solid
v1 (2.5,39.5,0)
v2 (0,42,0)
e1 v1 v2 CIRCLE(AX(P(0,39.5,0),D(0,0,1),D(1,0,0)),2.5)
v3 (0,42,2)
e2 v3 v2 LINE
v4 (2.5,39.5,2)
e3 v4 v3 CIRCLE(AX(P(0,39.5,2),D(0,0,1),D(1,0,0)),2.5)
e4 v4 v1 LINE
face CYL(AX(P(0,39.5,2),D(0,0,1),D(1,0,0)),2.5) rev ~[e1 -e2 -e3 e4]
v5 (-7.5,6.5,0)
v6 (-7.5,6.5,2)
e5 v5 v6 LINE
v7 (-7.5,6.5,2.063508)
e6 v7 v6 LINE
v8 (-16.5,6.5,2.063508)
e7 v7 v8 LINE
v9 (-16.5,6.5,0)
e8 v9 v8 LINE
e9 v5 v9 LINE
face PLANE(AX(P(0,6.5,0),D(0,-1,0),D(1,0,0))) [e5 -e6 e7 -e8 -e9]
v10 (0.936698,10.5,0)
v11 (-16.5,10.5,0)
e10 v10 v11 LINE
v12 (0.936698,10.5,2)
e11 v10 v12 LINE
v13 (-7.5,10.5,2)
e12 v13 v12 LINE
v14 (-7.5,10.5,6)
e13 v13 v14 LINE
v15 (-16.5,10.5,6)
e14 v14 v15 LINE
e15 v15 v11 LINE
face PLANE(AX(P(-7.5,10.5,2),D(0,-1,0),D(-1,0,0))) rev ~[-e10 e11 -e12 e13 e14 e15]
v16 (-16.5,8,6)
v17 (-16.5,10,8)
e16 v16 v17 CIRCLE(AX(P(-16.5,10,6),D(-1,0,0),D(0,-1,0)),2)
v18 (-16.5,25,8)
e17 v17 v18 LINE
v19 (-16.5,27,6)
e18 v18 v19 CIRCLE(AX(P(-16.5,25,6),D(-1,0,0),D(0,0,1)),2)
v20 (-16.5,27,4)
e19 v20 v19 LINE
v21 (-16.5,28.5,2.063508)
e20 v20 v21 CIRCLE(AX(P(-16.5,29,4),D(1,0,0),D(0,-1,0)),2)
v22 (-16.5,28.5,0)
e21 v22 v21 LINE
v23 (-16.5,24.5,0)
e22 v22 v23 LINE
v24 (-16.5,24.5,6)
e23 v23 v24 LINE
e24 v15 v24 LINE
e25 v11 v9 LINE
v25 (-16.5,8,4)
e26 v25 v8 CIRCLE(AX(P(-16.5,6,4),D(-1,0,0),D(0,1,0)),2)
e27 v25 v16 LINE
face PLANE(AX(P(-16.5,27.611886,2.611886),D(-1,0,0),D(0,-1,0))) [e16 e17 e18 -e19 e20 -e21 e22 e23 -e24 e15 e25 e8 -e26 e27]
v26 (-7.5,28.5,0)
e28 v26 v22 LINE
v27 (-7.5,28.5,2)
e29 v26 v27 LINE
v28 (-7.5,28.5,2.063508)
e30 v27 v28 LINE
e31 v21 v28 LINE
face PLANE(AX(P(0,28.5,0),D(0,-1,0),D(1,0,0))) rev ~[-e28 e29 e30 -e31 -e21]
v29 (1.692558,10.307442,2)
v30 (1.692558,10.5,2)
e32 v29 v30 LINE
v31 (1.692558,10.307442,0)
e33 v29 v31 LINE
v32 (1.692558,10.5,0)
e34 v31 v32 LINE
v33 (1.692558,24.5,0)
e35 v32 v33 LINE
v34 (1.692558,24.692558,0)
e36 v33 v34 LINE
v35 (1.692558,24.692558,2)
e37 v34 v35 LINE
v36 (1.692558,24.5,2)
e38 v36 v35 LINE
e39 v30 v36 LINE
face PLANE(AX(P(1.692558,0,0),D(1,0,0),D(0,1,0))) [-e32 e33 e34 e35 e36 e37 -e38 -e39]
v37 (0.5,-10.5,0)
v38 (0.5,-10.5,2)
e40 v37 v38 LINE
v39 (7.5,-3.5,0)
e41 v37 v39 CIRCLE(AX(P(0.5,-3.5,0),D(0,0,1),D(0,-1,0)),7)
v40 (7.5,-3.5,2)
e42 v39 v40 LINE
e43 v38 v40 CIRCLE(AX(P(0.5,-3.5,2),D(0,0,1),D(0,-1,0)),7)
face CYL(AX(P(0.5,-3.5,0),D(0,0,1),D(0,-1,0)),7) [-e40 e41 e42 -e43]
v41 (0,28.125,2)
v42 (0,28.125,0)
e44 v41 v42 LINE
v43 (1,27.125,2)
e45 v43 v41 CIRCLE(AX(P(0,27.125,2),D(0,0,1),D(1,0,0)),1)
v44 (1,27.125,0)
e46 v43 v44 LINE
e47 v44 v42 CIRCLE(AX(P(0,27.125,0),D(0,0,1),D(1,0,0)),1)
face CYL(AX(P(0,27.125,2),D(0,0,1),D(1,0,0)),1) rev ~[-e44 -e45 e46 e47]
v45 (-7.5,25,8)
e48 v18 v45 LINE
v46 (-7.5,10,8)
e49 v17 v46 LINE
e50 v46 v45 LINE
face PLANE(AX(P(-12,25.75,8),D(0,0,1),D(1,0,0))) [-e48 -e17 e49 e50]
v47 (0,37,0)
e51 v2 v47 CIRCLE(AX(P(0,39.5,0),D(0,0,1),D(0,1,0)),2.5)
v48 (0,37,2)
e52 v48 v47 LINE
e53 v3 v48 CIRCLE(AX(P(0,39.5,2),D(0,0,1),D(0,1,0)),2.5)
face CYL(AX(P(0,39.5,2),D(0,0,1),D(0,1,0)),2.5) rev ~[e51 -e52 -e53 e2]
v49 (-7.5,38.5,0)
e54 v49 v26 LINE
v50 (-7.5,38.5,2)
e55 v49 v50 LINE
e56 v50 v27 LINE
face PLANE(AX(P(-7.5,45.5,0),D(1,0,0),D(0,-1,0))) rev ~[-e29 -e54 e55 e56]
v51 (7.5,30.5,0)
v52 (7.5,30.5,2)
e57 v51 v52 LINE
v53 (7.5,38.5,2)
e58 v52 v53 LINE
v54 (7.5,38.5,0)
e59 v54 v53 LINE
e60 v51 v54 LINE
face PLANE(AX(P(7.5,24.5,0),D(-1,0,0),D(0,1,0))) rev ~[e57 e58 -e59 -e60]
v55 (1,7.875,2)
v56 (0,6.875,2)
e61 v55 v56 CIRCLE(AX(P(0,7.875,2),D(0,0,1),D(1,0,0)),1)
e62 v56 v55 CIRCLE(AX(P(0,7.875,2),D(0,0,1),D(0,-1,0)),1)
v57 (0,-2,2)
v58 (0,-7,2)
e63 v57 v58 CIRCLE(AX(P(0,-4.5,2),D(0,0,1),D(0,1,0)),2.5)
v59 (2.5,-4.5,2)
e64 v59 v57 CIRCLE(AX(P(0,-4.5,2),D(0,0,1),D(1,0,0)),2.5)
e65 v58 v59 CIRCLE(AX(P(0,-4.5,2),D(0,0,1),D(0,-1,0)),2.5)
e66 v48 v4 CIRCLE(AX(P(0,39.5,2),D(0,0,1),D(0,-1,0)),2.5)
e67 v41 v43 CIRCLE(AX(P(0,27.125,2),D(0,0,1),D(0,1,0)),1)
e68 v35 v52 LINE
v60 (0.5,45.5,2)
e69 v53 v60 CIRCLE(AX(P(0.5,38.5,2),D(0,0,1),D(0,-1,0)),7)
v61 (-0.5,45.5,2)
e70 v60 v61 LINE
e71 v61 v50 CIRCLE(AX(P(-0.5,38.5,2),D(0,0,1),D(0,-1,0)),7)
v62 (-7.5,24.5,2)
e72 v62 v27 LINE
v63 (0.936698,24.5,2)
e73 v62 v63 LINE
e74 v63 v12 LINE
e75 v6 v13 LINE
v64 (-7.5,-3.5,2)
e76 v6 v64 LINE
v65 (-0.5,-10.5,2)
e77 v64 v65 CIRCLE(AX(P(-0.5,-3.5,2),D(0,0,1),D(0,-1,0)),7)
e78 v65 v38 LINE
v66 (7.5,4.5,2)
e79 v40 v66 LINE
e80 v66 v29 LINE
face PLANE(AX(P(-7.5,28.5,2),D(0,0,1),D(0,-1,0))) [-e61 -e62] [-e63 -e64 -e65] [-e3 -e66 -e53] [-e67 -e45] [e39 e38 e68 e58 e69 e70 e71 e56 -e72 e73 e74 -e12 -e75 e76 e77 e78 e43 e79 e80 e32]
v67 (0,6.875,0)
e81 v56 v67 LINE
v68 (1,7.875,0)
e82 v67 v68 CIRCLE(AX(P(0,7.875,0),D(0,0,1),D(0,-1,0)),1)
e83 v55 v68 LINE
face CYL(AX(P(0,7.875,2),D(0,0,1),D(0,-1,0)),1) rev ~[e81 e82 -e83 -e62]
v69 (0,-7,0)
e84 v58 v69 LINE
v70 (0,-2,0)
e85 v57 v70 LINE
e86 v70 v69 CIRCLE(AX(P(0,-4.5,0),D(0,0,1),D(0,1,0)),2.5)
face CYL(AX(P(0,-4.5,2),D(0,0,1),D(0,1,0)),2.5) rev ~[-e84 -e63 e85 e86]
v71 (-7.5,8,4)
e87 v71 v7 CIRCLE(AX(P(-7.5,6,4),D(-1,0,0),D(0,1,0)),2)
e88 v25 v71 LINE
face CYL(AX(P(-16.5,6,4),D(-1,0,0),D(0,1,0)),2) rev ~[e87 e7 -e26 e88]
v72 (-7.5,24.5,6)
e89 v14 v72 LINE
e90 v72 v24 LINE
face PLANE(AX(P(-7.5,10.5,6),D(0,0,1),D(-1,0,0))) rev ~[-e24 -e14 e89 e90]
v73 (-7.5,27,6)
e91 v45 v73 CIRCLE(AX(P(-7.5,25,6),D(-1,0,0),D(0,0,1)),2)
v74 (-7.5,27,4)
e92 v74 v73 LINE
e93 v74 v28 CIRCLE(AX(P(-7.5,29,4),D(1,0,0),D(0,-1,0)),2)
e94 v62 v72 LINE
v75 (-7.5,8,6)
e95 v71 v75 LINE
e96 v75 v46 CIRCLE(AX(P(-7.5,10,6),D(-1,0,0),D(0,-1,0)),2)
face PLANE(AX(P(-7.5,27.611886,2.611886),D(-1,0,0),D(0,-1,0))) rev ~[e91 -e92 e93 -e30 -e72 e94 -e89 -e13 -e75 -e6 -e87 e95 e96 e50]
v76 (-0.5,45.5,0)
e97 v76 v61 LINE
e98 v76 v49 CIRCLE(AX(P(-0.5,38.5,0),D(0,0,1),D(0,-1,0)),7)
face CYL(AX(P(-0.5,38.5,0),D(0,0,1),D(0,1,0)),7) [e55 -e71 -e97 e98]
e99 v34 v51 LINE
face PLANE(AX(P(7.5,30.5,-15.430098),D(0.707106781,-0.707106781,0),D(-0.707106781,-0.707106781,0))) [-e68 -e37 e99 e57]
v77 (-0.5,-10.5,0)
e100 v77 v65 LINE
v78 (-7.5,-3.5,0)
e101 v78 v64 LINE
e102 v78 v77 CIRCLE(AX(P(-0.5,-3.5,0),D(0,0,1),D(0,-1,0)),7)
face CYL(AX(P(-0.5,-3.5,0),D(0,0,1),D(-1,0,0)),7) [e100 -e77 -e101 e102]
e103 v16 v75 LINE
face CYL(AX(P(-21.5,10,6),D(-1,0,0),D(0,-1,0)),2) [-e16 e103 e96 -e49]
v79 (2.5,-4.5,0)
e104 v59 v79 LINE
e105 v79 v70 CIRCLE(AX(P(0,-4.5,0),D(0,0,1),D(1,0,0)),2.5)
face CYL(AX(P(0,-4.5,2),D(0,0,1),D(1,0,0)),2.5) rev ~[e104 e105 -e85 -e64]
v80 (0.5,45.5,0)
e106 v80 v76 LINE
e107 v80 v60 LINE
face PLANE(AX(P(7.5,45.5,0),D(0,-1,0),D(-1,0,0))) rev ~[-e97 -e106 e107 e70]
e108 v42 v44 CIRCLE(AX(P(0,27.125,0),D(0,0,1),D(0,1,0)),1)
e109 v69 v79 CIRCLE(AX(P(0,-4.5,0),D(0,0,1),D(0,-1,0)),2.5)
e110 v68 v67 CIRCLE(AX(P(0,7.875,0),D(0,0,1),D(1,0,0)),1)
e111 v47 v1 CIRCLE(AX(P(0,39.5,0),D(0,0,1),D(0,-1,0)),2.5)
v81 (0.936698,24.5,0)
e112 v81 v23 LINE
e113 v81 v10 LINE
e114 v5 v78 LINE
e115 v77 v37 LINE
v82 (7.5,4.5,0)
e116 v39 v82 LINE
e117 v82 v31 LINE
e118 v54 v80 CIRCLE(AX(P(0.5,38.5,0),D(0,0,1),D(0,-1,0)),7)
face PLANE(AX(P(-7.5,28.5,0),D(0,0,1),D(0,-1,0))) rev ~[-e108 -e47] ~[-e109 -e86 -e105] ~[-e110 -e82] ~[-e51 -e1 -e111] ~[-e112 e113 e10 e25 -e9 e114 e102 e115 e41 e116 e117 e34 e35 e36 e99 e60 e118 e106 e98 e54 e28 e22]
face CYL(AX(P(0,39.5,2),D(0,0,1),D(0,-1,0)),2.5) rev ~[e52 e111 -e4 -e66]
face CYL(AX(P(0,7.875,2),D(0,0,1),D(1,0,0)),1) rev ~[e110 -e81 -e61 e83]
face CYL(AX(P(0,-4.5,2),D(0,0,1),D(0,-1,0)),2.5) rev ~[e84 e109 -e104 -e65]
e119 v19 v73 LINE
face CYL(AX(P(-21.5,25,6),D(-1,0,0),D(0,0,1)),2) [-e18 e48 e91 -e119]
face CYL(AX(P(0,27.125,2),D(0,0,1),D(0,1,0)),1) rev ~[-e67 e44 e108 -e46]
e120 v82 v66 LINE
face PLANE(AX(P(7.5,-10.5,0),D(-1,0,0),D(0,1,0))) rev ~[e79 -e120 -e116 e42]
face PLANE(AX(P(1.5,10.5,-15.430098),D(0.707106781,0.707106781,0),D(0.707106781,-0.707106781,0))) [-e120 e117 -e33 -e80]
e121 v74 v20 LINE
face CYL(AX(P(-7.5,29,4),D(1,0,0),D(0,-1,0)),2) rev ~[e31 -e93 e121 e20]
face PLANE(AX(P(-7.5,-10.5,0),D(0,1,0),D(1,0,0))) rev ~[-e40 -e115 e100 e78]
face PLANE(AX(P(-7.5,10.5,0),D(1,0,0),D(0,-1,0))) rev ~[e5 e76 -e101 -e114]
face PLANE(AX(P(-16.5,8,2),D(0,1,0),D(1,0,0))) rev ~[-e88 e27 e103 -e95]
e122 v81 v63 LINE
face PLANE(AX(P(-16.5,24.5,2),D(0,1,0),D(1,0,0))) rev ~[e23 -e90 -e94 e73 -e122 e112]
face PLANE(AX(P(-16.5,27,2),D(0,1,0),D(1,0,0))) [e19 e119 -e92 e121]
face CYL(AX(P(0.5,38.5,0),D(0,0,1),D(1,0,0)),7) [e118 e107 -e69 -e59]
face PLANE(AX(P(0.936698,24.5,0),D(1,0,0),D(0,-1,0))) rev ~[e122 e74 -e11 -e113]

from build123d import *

# Parameters (mm, degrees)
F0_W          = 0.7558596553
F0_H          = 7
F1_DEPTH      = 2
F2_R          = 7
F4_DEPTH      = 2
F5_W          = 4
F5_H          = 2
F6_DEPTH      = 9
F8_DEPTH      = 6
F9_W          = 9
F9_H          = 2
F10_DEPTH     = 14
F11_W         = 4
F11_H         = 2
F12_DEPTH     = 9
F13_W         = 9
F13_H         = 2.5
F14_DEPTH     = 6
F15_T4_DEPTH  = 32.8601958556
F15_T9_DEPTH  = 32.8601958556
F16_T4_DEPTH  = 9
F16_T9_DEPTH  = 9
F16_T11_DEPTH = 19


# Not quite as in the source:
# - a fillet or chamfer that OpenCascade refuses, or shapes differently, is made with other operations: its cross-section is extruded or revolved along the edge and cut away or added
# - a feature names something its author has since deleted; it is built from what else it names


with BuildPart() as f1:
    # F0 (on Top) → F1 (new body)
    with BuildSketch(Plane.XY):
        Polygon((-2.7234070003, 10.5), (-7.5, 10.5), (-7.5, -10.5), (7.5, -10.5), (7.5, 10.5), (1.692557591, 10.5), (0.9366979357, 10.5), (-1.7226199852, 10.5), (-2.5201837998, 10.5), align=None)
        with Locations((1.3146277633, 14)):
            Rectangle(F0_W, F0_H)
        with Locations((1.3146277633, 21)):
            Rectangle(F0_W, F0_H)
        Polygon((-1.7226199852, 24.5), (0.9366979357, 24.5), (1.692557591, 24.5), (7.5, 24.5), (7.5, 45.5), (-7.5, 45.5), (-7.5, 24.5), (-2.7234070003, 24.5), (-2.5201837998, 24.5), align=None)
    extrude(amount=F1_DEPTH)

    # F2
    f2_edges = [f1.edges().sort_by_distance(p)[0] for p in [
        (-7.5, -10.5, 1),
        (7.5, -10.5, 1),
        (7.5, 45.5, 1),
        (-7.5, 45.5, 1),
    ]]
    fillet(f2_edges, radius=F2_R)

    # F3 (on face) → F4 (cut, through all)
    with BuildSketch(Plane.XY.offset(2)):
        with BuildLine():
            ThreePointArc((0, -7), (1.767766953, -6.267766953), (2.5, -4.5))
            ThreePointArc((2.5, -4.5), (1.767766953, -2.732233047), (0, -2))
            Line((0, -2), (0, -4.5))
            Line((0, -4.5), (0, -7))
        make_face()
        with BuildLine():
            ThreePointArc((1, 7.875), (-0.7071067812, 8.5821067812), (0, 6.875))
            ThreePointArc((0, 6.875), (0.7071067812, 7.1678932188), (1, 7.875))
        make_face()
        with BuildLine():
            Line((0, -4.5), (0, -2))
            ThreePointArc((0, -2), (-2.5, -4.5), (0, -7))
            Line((0, -7), (0, -4.5))
        make_face()
        with BuildLine():
            ThreePointArc((2.5, 39.5), (1.767766953, 41.267766953), (0, 42))
            Line((0, 42), (0, 39.5))
            Line((0, 39.5), (0, 37))
            ThreePointArc((0, 37), (1.767766953, 37.732233047), (2.5, 39.5))
        make_face()
        with BuildLine():
            ThreePointArc((1, 27.125), (0.7071067812, 27.8321067812), (0, 28.125))
            ThreePointArc((0, 28.125), (-0.7071067812, 26.4178932188), (1, 27.125))
        make_face()
        with BuildLine():
            Line((0, 39.5), (0, 42))
            ThreePointArc((0, 42), (-2.5, 39.5), (0, 37))
            Line((0, 37), (0, 39.5))
        make_face()
    extrude(amount=-F4_DEPTH, mode=Mode.SUBTRACT)

    # F5 (on face) → F6 (join)
    with BuildSketch(Plane(origin=(-7.5, 0, 0), x_dir=(0, -1, 0), z_dir=(-1, 0, 0))):
        with Locations((-8.5, 1)):
            Rectangle(F5_W, F5_H)
    extrude(amount=F6_DEPTH)

    # F7 (on face) → F8 (join)
    with BuildSketch(Plane.XY.offset(2)):
        Polygon((-8.0660292879, 10.5), (-16.5, 10.5), (-16.5, 8), (-7.5, 8), (-7.5, 10.5), align=None)
    extrude(amount=F8_DEPTH)

    # F9 (on face) → F10 (join)
    with BuildSketch(Plane(origin=(0, 10.5, 0), x_dir=(-1, 0, 0), z_dir=(0, 1, 0))):
        with Locations((12, 7)):
            Rectangle(F9_W, F9_H)
    extrude(amount=F10_DEPTH)

    # F11 (on face) → F12 (join)
    with BuildSketch(Plane(origin=(-7.5, 0, 0), x_dir=(0, -1, 0), z_dir=(-1, 0, 0))):
        with Locations((-26.5, 1)):
            Rectangle(F11_W, F11_H)
    extrude(amount=F12_DEPTH)

    # F13 (on face) → F14 (join)
    with BuildSketch(Plane.XY.offset(2)):
        with Locations((-12, 25.75)):
            Rectangle(F13_W, F13_H)
    extrude(amount=F14_DEPTH)

    # F15: chamfer of 6 on 2 edges, made by hand


with BuildPart() as f15_tool2:
    # F15_s3 → F15_t4 (new body)
    with BuildSketch(Plane.XY.offset(-15.4300979278)):
        Polygon((1.5, 10.5), (7.5, 4.5), (7.5, 10.5), align=None)
    extrude(amount=F15_T4_DEPTH)

    split(bisect_by=Plane.YZ.offset(1.692557591), keep=Keep.TOP)


with BuildPart() as f1_1:
    add(f1.part)

    # F15_t1: cut F15_tool2
    add(f15_tool2.part, mode=Mode.SUBTRACT)


with BuildPart() as f15_tool7:
    # F15_s8 → F15_t9 (new body)
    with BuildSketch(Plane.XY.offset(-15.4300979278)):
        Polygon((7.5, 30.5), (1.5, 24.5), (7.5, 24.5), align=None)
    extrude(amount=F15_T9_DEPTH)

    split(bisect_by=Plane.YZ.offset(1.692557591), keep=Keep.TOP)


with BuildPart() as f1_2:
    add(f1_1.part)

    # F15_t6: cut F15_tool7
    add(f15_tool7.part, mode=Mode.SUBTRACT)

    # F16: fillet of radius 2 on 4 edges, made by hand


with BuildPart() as f16_tool2:
    # F16_s3 → F16_t4 (new body)
    with BuildSketch(Plane.YZ.offset(-16.5)):
        with BuildLine():
            ThreePointArc((8, 4), (7.4142135624, 2.5857864376), (6, 2))
            Line((6, 2), (8, 2))
            Line((8, 2), (8, 4))
        make_face()
    extrude(amount=F16_T4_DEPTH)

    split(bisect_by=Plane.XZ.offset(-6.5), keep=Keep.BOTTOM)


with BuildPart() as f1_3:
    add(f1_2.part)

    # F16_t1: union F16_tool2
    add(f16_tool2.part)


with BuildPart() as f16_tool7:
    # F16_s8 → F16_t9 (new body)
    with BuildSketch(Plane.YZ.offset(-7.5)):
        with BuildLine():
            ThreePointArc((27, 4), (27.5857864376, 2.5857864376), (29, 2))
            Line((29, 2), (27, 2))
            Line((27, 2), (27, 4))
        make_face()
    extrude(amount=-F16_T9_DEPTH)

    split(bisect_by=Plane.XZ.offset(-28.5), keep=Keep.TOP)


with BuildPart() as f1_4:
    add(f1_3.part)

    # F16_t6: union F16_tool7
    add(f16_tool7.part)

    # F16_s12 → F16_t11 (cut)
    with BuildSketch(Plane.YZ.offset(-21.5)):
        with BuildLine():
            ThreePointArc((8, 6), (8.5857864376, 7.4142135624), (10, 8))
            Line((10, 8), (8, 8))
            Line((8, 8), (8, 6))
        make_face()
        with BuildLine():
            ThreePointArc((25, 8), (26.4142135624, 7.4142135624), (27, 6))
            Line((27, 6), (27, 8))
            Line((27, 8), (25, 8))
        make_face()
    extrude(amount=F16_T11_DEPTH, mode=Mode.SUBTRACT)


solid = f1_4.part
